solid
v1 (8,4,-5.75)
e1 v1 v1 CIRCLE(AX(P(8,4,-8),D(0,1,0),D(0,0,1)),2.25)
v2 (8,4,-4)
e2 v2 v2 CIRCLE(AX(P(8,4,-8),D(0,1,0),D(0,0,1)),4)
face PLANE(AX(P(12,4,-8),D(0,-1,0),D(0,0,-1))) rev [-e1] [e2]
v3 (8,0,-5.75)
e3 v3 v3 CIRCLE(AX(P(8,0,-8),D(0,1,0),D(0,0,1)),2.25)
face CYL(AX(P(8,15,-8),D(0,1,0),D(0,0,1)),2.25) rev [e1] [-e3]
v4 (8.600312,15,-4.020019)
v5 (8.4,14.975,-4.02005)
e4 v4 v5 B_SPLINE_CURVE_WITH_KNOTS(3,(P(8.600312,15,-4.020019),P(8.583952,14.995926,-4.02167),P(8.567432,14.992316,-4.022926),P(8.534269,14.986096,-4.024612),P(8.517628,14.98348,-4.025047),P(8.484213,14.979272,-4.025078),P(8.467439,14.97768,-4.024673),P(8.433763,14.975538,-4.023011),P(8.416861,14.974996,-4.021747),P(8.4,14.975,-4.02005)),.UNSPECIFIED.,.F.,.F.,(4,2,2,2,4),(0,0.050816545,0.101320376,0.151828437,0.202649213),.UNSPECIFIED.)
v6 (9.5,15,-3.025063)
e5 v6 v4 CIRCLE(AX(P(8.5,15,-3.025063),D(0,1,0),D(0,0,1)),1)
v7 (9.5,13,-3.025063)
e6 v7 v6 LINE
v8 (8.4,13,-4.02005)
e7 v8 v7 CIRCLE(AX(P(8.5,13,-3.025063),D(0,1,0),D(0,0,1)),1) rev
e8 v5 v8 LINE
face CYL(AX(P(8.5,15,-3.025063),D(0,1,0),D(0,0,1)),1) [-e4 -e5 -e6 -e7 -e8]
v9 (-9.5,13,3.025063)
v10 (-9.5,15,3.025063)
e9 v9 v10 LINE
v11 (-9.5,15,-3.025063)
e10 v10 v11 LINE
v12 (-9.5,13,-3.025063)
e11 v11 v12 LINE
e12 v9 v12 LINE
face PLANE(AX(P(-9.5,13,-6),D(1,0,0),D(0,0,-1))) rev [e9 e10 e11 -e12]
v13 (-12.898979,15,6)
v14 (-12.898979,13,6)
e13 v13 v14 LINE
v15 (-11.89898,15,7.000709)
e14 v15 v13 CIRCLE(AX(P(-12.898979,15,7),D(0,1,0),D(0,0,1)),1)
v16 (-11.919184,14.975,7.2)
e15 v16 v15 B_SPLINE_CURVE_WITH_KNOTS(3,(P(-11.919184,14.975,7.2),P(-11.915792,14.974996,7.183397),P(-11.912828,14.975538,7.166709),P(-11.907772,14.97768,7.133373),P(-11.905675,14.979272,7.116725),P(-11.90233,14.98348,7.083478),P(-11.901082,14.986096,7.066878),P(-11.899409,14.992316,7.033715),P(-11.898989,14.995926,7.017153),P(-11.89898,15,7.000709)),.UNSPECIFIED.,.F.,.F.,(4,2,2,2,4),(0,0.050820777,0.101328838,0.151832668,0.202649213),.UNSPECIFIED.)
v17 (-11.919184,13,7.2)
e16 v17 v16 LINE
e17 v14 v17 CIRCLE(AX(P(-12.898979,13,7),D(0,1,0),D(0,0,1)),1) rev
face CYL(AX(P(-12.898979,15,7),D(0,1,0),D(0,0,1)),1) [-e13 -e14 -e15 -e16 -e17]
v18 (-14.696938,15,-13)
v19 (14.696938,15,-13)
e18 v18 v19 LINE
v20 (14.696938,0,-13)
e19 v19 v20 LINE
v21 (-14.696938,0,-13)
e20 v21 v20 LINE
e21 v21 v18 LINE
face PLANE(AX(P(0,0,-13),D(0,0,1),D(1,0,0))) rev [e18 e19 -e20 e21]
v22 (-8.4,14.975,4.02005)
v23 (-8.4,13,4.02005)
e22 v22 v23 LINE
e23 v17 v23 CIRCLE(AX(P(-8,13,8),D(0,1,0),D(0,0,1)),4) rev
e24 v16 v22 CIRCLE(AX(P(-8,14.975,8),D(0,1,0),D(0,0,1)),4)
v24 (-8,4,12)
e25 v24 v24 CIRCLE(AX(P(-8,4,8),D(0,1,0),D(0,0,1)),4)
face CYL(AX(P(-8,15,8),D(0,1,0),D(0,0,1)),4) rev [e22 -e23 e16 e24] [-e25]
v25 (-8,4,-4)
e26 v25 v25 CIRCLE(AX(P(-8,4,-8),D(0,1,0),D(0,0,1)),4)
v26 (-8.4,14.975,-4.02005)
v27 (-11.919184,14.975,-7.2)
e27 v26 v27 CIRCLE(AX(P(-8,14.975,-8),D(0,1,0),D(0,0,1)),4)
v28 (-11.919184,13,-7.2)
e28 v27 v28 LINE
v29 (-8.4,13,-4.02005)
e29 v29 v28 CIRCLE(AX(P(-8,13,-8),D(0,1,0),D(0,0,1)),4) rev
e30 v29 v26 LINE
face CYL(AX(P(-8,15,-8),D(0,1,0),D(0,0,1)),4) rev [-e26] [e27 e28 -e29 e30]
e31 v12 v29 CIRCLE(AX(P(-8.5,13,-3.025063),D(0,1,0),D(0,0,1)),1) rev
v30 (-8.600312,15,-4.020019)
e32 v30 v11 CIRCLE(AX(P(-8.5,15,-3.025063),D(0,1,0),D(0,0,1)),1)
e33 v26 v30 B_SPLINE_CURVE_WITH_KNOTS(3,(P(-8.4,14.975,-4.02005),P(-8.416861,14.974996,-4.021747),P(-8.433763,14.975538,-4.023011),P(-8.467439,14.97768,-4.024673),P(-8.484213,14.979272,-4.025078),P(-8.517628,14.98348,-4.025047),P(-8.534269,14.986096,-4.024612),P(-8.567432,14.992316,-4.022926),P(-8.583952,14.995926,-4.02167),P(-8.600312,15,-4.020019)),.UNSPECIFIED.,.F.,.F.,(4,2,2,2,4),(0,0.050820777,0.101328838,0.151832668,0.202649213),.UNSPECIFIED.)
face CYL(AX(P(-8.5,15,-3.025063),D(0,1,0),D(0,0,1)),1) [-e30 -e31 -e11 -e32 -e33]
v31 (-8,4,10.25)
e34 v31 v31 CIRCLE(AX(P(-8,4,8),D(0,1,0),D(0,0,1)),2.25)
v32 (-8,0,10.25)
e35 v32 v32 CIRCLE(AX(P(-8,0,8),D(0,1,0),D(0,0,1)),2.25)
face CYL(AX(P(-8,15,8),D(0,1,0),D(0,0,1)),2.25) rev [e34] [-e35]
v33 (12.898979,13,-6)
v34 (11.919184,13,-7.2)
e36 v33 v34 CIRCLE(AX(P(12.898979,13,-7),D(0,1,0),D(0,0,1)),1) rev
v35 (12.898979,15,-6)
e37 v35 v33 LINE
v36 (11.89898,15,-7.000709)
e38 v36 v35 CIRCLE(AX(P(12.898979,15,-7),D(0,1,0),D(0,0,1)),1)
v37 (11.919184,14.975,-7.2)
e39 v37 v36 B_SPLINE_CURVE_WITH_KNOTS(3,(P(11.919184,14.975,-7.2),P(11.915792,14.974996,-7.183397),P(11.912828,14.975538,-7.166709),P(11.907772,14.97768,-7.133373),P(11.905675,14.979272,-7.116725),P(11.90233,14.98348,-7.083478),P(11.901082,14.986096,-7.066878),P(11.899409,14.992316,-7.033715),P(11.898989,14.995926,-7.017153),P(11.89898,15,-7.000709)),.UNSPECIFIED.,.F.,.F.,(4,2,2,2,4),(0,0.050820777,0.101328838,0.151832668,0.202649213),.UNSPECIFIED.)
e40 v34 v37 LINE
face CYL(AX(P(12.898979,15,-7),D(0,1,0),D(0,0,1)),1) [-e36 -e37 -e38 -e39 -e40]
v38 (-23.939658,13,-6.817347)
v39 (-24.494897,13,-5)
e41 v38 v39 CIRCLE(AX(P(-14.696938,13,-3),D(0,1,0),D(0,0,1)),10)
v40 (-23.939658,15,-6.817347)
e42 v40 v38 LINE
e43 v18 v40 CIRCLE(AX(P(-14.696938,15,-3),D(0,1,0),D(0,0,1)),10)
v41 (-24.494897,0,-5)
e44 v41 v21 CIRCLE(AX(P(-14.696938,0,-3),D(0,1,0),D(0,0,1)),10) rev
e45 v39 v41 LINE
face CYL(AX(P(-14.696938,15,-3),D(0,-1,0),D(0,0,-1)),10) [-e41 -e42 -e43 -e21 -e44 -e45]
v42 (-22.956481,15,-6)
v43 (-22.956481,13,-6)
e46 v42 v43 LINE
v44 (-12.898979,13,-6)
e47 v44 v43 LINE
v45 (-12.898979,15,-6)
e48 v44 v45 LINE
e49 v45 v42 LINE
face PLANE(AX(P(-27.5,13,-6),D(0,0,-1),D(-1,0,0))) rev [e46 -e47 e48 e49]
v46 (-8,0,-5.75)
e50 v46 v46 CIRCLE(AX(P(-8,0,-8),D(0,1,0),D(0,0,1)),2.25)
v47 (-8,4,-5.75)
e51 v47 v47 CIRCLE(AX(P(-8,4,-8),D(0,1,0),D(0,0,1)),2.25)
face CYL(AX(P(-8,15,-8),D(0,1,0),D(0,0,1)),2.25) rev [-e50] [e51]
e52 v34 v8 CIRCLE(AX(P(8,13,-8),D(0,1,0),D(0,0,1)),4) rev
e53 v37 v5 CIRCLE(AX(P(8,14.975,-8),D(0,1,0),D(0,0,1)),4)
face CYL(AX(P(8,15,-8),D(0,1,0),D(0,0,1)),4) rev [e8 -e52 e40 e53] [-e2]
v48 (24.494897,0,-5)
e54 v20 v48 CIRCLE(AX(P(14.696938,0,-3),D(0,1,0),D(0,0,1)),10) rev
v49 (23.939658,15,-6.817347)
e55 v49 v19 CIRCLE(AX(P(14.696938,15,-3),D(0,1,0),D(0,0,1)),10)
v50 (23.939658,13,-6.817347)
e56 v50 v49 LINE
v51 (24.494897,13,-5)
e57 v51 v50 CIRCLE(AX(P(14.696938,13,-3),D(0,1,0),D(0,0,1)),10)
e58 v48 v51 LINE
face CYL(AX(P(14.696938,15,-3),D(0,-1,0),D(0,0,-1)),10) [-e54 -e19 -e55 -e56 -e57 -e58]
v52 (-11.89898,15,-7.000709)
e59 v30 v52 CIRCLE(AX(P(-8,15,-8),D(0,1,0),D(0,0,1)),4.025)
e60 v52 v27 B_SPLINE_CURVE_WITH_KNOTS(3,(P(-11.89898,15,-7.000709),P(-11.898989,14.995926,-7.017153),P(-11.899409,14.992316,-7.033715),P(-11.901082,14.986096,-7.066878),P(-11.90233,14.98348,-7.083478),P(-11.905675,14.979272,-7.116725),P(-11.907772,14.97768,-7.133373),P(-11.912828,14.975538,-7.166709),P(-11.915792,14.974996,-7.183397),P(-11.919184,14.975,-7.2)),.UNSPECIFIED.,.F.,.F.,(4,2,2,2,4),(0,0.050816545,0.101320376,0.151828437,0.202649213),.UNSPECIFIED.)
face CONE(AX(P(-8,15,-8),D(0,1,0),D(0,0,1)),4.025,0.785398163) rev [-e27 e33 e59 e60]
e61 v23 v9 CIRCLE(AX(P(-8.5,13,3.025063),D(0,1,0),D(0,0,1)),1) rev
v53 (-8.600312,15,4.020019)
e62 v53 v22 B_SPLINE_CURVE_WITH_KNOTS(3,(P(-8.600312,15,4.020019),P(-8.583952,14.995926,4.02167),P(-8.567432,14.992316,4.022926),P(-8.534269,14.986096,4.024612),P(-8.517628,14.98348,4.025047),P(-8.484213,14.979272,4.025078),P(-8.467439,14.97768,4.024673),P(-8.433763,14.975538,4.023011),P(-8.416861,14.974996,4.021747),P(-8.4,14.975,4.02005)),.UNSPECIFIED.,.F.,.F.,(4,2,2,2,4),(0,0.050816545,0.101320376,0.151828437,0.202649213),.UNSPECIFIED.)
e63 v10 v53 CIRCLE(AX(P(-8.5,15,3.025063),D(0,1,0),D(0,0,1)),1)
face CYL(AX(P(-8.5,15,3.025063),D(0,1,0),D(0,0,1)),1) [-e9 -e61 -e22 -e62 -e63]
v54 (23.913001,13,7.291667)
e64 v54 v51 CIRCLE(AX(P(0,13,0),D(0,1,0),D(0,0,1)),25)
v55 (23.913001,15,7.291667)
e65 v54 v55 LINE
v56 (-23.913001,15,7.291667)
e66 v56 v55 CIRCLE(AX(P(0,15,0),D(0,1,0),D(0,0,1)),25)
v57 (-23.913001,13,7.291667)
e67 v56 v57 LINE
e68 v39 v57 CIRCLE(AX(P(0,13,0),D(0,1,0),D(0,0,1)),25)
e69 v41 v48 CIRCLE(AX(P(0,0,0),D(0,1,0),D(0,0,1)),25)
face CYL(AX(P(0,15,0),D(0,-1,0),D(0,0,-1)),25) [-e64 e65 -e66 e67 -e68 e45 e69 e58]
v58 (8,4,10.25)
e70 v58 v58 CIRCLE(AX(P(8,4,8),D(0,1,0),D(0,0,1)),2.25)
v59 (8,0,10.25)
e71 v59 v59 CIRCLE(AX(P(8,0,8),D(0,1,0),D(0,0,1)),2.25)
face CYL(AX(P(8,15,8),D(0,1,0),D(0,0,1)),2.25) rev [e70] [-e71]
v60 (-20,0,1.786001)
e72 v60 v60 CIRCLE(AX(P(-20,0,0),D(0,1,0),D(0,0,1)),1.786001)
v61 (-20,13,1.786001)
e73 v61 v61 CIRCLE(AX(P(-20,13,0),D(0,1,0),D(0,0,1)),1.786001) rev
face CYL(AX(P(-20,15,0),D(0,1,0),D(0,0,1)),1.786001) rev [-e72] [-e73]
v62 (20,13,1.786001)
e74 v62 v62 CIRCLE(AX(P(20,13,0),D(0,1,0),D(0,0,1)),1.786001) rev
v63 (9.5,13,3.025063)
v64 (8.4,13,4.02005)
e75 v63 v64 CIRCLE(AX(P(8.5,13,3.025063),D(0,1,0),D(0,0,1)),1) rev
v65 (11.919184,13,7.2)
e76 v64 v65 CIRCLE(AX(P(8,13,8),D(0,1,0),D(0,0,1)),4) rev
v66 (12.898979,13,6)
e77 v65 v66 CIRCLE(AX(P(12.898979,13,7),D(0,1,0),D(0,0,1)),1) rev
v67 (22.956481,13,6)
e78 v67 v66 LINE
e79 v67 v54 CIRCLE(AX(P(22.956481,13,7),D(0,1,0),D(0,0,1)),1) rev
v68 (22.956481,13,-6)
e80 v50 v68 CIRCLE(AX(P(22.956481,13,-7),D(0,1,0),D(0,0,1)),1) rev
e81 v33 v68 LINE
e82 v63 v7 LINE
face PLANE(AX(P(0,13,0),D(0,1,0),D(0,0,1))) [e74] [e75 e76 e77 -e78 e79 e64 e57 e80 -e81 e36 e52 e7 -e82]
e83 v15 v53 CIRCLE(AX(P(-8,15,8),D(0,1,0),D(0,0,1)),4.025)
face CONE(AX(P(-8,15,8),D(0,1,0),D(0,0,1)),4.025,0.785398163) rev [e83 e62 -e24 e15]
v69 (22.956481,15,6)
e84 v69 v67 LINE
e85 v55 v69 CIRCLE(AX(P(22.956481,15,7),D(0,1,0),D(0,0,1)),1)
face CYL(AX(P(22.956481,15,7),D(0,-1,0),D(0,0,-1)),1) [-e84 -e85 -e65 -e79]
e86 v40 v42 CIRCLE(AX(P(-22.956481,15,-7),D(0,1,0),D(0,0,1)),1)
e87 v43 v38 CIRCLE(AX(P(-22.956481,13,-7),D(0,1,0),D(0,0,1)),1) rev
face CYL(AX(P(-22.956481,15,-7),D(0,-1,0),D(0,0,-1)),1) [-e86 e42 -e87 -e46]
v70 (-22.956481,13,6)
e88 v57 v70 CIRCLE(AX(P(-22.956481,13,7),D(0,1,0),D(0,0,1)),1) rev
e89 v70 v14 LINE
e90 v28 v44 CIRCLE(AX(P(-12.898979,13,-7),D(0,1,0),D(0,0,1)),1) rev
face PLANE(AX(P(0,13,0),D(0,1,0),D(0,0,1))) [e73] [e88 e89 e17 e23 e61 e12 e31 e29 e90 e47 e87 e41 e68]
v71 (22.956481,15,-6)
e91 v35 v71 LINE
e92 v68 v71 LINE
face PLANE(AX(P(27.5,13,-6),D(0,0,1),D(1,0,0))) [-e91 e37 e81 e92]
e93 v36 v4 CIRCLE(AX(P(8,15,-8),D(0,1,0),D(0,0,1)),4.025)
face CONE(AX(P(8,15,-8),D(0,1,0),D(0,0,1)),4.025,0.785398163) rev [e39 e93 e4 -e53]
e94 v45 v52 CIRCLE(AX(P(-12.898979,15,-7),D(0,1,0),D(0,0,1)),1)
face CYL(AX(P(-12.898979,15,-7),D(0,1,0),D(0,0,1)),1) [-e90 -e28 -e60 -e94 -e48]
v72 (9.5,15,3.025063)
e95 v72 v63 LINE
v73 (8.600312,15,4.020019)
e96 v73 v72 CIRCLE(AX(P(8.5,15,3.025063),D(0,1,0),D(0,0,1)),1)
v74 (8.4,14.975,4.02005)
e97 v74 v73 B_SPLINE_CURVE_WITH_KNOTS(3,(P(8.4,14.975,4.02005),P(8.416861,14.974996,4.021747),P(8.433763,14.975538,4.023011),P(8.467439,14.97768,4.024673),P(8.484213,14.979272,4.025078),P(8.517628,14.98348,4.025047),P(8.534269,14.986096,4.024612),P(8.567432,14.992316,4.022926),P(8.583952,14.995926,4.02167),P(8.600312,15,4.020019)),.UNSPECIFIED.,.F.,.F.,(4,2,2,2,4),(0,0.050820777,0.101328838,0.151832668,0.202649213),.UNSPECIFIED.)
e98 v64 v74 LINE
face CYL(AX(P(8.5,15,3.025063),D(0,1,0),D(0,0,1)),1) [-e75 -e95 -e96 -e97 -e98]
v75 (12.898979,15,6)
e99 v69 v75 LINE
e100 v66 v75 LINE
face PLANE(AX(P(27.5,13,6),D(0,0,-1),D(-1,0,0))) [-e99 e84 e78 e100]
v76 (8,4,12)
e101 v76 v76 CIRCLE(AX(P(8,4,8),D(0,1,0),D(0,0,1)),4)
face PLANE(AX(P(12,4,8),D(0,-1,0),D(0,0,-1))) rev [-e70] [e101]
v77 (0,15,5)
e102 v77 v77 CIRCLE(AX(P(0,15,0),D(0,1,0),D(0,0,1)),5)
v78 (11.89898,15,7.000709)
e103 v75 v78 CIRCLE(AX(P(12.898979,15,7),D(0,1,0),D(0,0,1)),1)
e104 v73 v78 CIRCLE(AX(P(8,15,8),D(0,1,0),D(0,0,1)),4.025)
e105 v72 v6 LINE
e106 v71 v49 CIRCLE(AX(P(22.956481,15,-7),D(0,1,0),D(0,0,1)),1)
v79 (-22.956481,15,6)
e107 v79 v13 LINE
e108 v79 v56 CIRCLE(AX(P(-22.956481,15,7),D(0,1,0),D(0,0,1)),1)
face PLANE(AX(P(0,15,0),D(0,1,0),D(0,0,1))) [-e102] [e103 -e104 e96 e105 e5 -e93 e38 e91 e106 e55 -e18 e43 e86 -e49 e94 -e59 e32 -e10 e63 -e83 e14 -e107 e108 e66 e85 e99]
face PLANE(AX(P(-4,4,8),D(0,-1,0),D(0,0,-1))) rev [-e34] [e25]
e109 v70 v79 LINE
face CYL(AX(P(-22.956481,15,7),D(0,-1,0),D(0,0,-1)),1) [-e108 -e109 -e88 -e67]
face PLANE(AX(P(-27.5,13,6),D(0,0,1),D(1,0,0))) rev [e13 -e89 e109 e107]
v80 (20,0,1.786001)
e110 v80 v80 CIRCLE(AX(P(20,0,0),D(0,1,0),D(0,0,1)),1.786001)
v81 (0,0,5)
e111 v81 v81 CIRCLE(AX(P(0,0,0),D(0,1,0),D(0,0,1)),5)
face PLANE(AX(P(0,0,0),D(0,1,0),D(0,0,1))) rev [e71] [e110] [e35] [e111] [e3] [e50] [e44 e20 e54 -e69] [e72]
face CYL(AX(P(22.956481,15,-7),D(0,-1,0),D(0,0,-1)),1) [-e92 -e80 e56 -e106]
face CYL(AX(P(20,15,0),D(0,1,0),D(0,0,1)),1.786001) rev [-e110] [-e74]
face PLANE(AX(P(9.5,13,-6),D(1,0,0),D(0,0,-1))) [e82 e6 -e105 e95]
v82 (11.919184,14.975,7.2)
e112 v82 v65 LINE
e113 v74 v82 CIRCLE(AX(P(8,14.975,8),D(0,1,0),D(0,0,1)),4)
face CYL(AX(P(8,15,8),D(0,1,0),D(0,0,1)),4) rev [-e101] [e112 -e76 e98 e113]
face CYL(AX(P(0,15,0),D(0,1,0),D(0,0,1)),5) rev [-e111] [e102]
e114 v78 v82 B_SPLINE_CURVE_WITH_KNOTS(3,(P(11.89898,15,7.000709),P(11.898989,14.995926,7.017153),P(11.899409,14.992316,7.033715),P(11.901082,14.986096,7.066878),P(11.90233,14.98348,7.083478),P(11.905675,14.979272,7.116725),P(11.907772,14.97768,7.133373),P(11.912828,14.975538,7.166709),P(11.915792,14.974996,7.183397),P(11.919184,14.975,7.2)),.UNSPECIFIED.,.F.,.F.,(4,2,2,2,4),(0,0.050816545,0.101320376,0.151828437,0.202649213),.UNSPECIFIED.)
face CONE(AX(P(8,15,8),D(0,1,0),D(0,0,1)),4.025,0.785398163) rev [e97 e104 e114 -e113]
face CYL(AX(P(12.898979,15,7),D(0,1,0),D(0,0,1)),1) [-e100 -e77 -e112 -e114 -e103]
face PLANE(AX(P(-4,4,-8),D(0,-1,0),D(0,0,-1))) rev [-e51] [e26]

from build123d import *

# Parameters (mm, degrees)
SKETCH1_R                       = 25
BOSS_EXTRUDE1_DEPTH             = 15
CBORE_FOR_M4_SHCS1_AT_2_COUNT   = 2
CBORE_FOR_M4_SHCS1_AT_2_PITCH   = 16
CBORE_FOR_M4_SHCS1_AT_3_COUNT   = 2
CBORE_FOR_M4_SHCS1_AT_3_PITCH   = 22.627416998
CBORE_FOR_M4_SHCS1_AT_4_COUNT   = 2
CBORE_FOR_M4_SHCS1_AT_4_PITCH   = 16
F_10_0MM_DOWEL_HOLE1_D          = 10
F_9_64_0_14063_DIAMETER_HOLE1_D = 3.572002
SKETCH9_W                       = 18
SKETCH9_H                       = 12
CUT_EXTRUDE1_DEPTH              = 2
FILLET2_R                       = 1
CUT_EXTRUDE2_DEPTH              = 39.405728739
FILLET3_START                   = -1
FILLET3_DEPTH                   = 17


with BuildPart() as part:
    # Sketch1 → Boss-Extrude1 (new body)
    with BuildSketch(Plane(origin=(0, 0, 0), x_dir=(1, 0, 0), z_dir=(0, 1, 0))):
        with Locations(Location((0, 0, 0), (0, 0, 270))):
            Circle(SKETCH1_R)
    extrude(amount=BOSS_EXTRUDE1_DEPTH)

    # Sketch4 → CBORE for M4 SHCS1 (revolve, cut)
    with BuildSketch(Plane(origin=(-8, 15, -8), x_dir=(0, 0, 1), z_dir=(1, 0, 0))):
        Polygon((0, 0), (0, 15), (2.25, 15), (2.25, 11), (4, 11), (4, 0.025), (4.025, 0), align=None)
    cbore_for_m4_shcs1 = revolve(axis=Axis((-8, 21.35, -8), (0, -1, 0)), mode=Mode.SUBTRACT)

    # CBORE for M4 SHCS1 at 2: CBORE for M4 SHCS1 ×2
    with Locations(*[(i * CBORE_FOR_M4_SHCS1_AT_2_PITCH, 0, 0) for i in range(1, CBORE_FOR_M4_SHCS1_AT_2_COUNT)]):
        add(cbore_for_m4_shcs1, mode=Mode.SUBTRACT)

    # CBORE for M4 SHCS1 at 3: CBORE for M4 SHCS1 ×2
    with Locations(*[Vector(0.7071067811865476, 0, 0.7071067811865476) * (i * CBORE_FOR_M4_SHCS1_AT_3_PITCH) for i in range(1, CBORE_FOR_M4_SHCS1_AT_3_COUNT)]):
        add(cbore_for_m4_shcs1, mode=Mode.SUBTRACT)

    # CBORE for M4 SHCS1 at 4: CBORE for M4 SHCS1 ×2
    with Locations(*[(0, 0, i * CBORE_FOR_M4_SHCS1_AT_4_PITCH) for i in range(1, CBORE_FOR_M4_SHCS1_AT_4_COUNT)]):
        add(cbore_for_m4_shcs1, mode=Mode.SUBTRACT)

    # Ø10.0mm Dowel Hole1 (through all)
    with Locations(Plane(origin=(0, 15, 0), x_dir=(1, 0, 0), z_dir=(0, 1, 0))):
        with Locations((0, 0)):
            Hole(F_10_0MM_DOWEL_HOLE1_D / 2)

    # 9/64 (0.14063) Diameter Hole1 (through all)
    with Locations(Plane(origin=(0, 15, 0), x_dir=(1, 0, 0), z_dir=(0, 1, 0))):
        with Locations((-20, 0), (20, 0)):
            Hole(F_9_64_0_14063_DIAMETER_HOLE1_D / 2)

    # Sketch9 → Cut-Extrude1 (cut)
    with BuildSketch(Plane(origin=(0, 15, 0), x_dir=(1, 0, 0), z_dir=(0, 1, 0))):
        with Locations((-18.5, 0)):
            Rectangle(SKETCH9_W, SKETCH9_H)
    cut_extrude1 = extrude(amount=-CUT_EXTRUDE1_DEPTH, mode=Mode.SUBTRACT)

    # Mirror1: Cut-Extrude1 across plane
    add(cut_extrude1.mirror(Plane(origin=(0, 0, 0), x_dir=(0, 0, 1), z_dir=(1, 0, 0))), mode=Mode.SUBTRACT)

    # Fillet2
    fillet2_edges = [part.edges().sort_by_distance(p)[0] for p in [
        (-24.269322199, 14, -6),
        (-24.269322199, 14, 6),
        (-11.464101615, 13.9875, 6),
        (-9.5, 13.9875, 4.291900756),
        (-11.464101615, 13.9875, -6),
        (-9.5, 13.9875, -4.291900756),
        (24.269322199, 14, 6),
        (9.5, 13.9875, 4.291900756),
        (9.5, 13.9875, -4.291900756),
        (24.269322199, 14, -6),
        (11.464101615, 13.9875, -6),
        (11.464101615, 13.9875, 6),
    ]]
    fillet(fillet2_edges, radius=FILLET2_R)

    # Sketch10 → Cut-Extrude2 (cut, through all)
    with BuildSketch(Plane(origin=(0, 15, 0), x_dir=(1, 0, 0), z_dir=(0, 1, 0))):
        with BuildLine():
            ThreePointArc((21.354156504, 13), (0, 25), (-21.354156504, 13))
            Line((-21.354156504, 13), (21.354156504, 13))
        make_face()
    extrude(amount=-CUT_EXTRUDE2_DEPTH, mode=Mode.SUBTRACT)

    # Fillet3: read off the stored shape, not the designer's step
    # Fillet3 outline → Fillet3 (cut)
    with BuildSketch(Plane(origin=(0, 0, 0), x_dir=(1, 0, 0), z_dir=(0, 1, 0)).offset(FILLET3_START)):
        with BuildLine():
            Line((21.354156504, 13), (14.696938457, 13))
            ThreePointArc((14.696938457, 13), (21.021493777, 10.745966692), (24.494897428, 5))
            ThreePointArc((24.494897428, 5), (23.270881733, 9.135976324), (21.354156504, 13))
        make_face()
        with BuildLine():
            Line((-14.696938457, 13), (-21.354156504, 13))
            ThreePointArc((-21.354156504, 13), (-23.270881733, 9.135976324), (-24.494897428, 5))
            ThreePointArc((-24.494897428, 5), (-21.021493777, 10.745966692), (-14.696938457, 13))
        make_face()
    extrude(amount=FILLET3_DEPTH, mode=Mode.SUBTRACT)


solid = part.part
